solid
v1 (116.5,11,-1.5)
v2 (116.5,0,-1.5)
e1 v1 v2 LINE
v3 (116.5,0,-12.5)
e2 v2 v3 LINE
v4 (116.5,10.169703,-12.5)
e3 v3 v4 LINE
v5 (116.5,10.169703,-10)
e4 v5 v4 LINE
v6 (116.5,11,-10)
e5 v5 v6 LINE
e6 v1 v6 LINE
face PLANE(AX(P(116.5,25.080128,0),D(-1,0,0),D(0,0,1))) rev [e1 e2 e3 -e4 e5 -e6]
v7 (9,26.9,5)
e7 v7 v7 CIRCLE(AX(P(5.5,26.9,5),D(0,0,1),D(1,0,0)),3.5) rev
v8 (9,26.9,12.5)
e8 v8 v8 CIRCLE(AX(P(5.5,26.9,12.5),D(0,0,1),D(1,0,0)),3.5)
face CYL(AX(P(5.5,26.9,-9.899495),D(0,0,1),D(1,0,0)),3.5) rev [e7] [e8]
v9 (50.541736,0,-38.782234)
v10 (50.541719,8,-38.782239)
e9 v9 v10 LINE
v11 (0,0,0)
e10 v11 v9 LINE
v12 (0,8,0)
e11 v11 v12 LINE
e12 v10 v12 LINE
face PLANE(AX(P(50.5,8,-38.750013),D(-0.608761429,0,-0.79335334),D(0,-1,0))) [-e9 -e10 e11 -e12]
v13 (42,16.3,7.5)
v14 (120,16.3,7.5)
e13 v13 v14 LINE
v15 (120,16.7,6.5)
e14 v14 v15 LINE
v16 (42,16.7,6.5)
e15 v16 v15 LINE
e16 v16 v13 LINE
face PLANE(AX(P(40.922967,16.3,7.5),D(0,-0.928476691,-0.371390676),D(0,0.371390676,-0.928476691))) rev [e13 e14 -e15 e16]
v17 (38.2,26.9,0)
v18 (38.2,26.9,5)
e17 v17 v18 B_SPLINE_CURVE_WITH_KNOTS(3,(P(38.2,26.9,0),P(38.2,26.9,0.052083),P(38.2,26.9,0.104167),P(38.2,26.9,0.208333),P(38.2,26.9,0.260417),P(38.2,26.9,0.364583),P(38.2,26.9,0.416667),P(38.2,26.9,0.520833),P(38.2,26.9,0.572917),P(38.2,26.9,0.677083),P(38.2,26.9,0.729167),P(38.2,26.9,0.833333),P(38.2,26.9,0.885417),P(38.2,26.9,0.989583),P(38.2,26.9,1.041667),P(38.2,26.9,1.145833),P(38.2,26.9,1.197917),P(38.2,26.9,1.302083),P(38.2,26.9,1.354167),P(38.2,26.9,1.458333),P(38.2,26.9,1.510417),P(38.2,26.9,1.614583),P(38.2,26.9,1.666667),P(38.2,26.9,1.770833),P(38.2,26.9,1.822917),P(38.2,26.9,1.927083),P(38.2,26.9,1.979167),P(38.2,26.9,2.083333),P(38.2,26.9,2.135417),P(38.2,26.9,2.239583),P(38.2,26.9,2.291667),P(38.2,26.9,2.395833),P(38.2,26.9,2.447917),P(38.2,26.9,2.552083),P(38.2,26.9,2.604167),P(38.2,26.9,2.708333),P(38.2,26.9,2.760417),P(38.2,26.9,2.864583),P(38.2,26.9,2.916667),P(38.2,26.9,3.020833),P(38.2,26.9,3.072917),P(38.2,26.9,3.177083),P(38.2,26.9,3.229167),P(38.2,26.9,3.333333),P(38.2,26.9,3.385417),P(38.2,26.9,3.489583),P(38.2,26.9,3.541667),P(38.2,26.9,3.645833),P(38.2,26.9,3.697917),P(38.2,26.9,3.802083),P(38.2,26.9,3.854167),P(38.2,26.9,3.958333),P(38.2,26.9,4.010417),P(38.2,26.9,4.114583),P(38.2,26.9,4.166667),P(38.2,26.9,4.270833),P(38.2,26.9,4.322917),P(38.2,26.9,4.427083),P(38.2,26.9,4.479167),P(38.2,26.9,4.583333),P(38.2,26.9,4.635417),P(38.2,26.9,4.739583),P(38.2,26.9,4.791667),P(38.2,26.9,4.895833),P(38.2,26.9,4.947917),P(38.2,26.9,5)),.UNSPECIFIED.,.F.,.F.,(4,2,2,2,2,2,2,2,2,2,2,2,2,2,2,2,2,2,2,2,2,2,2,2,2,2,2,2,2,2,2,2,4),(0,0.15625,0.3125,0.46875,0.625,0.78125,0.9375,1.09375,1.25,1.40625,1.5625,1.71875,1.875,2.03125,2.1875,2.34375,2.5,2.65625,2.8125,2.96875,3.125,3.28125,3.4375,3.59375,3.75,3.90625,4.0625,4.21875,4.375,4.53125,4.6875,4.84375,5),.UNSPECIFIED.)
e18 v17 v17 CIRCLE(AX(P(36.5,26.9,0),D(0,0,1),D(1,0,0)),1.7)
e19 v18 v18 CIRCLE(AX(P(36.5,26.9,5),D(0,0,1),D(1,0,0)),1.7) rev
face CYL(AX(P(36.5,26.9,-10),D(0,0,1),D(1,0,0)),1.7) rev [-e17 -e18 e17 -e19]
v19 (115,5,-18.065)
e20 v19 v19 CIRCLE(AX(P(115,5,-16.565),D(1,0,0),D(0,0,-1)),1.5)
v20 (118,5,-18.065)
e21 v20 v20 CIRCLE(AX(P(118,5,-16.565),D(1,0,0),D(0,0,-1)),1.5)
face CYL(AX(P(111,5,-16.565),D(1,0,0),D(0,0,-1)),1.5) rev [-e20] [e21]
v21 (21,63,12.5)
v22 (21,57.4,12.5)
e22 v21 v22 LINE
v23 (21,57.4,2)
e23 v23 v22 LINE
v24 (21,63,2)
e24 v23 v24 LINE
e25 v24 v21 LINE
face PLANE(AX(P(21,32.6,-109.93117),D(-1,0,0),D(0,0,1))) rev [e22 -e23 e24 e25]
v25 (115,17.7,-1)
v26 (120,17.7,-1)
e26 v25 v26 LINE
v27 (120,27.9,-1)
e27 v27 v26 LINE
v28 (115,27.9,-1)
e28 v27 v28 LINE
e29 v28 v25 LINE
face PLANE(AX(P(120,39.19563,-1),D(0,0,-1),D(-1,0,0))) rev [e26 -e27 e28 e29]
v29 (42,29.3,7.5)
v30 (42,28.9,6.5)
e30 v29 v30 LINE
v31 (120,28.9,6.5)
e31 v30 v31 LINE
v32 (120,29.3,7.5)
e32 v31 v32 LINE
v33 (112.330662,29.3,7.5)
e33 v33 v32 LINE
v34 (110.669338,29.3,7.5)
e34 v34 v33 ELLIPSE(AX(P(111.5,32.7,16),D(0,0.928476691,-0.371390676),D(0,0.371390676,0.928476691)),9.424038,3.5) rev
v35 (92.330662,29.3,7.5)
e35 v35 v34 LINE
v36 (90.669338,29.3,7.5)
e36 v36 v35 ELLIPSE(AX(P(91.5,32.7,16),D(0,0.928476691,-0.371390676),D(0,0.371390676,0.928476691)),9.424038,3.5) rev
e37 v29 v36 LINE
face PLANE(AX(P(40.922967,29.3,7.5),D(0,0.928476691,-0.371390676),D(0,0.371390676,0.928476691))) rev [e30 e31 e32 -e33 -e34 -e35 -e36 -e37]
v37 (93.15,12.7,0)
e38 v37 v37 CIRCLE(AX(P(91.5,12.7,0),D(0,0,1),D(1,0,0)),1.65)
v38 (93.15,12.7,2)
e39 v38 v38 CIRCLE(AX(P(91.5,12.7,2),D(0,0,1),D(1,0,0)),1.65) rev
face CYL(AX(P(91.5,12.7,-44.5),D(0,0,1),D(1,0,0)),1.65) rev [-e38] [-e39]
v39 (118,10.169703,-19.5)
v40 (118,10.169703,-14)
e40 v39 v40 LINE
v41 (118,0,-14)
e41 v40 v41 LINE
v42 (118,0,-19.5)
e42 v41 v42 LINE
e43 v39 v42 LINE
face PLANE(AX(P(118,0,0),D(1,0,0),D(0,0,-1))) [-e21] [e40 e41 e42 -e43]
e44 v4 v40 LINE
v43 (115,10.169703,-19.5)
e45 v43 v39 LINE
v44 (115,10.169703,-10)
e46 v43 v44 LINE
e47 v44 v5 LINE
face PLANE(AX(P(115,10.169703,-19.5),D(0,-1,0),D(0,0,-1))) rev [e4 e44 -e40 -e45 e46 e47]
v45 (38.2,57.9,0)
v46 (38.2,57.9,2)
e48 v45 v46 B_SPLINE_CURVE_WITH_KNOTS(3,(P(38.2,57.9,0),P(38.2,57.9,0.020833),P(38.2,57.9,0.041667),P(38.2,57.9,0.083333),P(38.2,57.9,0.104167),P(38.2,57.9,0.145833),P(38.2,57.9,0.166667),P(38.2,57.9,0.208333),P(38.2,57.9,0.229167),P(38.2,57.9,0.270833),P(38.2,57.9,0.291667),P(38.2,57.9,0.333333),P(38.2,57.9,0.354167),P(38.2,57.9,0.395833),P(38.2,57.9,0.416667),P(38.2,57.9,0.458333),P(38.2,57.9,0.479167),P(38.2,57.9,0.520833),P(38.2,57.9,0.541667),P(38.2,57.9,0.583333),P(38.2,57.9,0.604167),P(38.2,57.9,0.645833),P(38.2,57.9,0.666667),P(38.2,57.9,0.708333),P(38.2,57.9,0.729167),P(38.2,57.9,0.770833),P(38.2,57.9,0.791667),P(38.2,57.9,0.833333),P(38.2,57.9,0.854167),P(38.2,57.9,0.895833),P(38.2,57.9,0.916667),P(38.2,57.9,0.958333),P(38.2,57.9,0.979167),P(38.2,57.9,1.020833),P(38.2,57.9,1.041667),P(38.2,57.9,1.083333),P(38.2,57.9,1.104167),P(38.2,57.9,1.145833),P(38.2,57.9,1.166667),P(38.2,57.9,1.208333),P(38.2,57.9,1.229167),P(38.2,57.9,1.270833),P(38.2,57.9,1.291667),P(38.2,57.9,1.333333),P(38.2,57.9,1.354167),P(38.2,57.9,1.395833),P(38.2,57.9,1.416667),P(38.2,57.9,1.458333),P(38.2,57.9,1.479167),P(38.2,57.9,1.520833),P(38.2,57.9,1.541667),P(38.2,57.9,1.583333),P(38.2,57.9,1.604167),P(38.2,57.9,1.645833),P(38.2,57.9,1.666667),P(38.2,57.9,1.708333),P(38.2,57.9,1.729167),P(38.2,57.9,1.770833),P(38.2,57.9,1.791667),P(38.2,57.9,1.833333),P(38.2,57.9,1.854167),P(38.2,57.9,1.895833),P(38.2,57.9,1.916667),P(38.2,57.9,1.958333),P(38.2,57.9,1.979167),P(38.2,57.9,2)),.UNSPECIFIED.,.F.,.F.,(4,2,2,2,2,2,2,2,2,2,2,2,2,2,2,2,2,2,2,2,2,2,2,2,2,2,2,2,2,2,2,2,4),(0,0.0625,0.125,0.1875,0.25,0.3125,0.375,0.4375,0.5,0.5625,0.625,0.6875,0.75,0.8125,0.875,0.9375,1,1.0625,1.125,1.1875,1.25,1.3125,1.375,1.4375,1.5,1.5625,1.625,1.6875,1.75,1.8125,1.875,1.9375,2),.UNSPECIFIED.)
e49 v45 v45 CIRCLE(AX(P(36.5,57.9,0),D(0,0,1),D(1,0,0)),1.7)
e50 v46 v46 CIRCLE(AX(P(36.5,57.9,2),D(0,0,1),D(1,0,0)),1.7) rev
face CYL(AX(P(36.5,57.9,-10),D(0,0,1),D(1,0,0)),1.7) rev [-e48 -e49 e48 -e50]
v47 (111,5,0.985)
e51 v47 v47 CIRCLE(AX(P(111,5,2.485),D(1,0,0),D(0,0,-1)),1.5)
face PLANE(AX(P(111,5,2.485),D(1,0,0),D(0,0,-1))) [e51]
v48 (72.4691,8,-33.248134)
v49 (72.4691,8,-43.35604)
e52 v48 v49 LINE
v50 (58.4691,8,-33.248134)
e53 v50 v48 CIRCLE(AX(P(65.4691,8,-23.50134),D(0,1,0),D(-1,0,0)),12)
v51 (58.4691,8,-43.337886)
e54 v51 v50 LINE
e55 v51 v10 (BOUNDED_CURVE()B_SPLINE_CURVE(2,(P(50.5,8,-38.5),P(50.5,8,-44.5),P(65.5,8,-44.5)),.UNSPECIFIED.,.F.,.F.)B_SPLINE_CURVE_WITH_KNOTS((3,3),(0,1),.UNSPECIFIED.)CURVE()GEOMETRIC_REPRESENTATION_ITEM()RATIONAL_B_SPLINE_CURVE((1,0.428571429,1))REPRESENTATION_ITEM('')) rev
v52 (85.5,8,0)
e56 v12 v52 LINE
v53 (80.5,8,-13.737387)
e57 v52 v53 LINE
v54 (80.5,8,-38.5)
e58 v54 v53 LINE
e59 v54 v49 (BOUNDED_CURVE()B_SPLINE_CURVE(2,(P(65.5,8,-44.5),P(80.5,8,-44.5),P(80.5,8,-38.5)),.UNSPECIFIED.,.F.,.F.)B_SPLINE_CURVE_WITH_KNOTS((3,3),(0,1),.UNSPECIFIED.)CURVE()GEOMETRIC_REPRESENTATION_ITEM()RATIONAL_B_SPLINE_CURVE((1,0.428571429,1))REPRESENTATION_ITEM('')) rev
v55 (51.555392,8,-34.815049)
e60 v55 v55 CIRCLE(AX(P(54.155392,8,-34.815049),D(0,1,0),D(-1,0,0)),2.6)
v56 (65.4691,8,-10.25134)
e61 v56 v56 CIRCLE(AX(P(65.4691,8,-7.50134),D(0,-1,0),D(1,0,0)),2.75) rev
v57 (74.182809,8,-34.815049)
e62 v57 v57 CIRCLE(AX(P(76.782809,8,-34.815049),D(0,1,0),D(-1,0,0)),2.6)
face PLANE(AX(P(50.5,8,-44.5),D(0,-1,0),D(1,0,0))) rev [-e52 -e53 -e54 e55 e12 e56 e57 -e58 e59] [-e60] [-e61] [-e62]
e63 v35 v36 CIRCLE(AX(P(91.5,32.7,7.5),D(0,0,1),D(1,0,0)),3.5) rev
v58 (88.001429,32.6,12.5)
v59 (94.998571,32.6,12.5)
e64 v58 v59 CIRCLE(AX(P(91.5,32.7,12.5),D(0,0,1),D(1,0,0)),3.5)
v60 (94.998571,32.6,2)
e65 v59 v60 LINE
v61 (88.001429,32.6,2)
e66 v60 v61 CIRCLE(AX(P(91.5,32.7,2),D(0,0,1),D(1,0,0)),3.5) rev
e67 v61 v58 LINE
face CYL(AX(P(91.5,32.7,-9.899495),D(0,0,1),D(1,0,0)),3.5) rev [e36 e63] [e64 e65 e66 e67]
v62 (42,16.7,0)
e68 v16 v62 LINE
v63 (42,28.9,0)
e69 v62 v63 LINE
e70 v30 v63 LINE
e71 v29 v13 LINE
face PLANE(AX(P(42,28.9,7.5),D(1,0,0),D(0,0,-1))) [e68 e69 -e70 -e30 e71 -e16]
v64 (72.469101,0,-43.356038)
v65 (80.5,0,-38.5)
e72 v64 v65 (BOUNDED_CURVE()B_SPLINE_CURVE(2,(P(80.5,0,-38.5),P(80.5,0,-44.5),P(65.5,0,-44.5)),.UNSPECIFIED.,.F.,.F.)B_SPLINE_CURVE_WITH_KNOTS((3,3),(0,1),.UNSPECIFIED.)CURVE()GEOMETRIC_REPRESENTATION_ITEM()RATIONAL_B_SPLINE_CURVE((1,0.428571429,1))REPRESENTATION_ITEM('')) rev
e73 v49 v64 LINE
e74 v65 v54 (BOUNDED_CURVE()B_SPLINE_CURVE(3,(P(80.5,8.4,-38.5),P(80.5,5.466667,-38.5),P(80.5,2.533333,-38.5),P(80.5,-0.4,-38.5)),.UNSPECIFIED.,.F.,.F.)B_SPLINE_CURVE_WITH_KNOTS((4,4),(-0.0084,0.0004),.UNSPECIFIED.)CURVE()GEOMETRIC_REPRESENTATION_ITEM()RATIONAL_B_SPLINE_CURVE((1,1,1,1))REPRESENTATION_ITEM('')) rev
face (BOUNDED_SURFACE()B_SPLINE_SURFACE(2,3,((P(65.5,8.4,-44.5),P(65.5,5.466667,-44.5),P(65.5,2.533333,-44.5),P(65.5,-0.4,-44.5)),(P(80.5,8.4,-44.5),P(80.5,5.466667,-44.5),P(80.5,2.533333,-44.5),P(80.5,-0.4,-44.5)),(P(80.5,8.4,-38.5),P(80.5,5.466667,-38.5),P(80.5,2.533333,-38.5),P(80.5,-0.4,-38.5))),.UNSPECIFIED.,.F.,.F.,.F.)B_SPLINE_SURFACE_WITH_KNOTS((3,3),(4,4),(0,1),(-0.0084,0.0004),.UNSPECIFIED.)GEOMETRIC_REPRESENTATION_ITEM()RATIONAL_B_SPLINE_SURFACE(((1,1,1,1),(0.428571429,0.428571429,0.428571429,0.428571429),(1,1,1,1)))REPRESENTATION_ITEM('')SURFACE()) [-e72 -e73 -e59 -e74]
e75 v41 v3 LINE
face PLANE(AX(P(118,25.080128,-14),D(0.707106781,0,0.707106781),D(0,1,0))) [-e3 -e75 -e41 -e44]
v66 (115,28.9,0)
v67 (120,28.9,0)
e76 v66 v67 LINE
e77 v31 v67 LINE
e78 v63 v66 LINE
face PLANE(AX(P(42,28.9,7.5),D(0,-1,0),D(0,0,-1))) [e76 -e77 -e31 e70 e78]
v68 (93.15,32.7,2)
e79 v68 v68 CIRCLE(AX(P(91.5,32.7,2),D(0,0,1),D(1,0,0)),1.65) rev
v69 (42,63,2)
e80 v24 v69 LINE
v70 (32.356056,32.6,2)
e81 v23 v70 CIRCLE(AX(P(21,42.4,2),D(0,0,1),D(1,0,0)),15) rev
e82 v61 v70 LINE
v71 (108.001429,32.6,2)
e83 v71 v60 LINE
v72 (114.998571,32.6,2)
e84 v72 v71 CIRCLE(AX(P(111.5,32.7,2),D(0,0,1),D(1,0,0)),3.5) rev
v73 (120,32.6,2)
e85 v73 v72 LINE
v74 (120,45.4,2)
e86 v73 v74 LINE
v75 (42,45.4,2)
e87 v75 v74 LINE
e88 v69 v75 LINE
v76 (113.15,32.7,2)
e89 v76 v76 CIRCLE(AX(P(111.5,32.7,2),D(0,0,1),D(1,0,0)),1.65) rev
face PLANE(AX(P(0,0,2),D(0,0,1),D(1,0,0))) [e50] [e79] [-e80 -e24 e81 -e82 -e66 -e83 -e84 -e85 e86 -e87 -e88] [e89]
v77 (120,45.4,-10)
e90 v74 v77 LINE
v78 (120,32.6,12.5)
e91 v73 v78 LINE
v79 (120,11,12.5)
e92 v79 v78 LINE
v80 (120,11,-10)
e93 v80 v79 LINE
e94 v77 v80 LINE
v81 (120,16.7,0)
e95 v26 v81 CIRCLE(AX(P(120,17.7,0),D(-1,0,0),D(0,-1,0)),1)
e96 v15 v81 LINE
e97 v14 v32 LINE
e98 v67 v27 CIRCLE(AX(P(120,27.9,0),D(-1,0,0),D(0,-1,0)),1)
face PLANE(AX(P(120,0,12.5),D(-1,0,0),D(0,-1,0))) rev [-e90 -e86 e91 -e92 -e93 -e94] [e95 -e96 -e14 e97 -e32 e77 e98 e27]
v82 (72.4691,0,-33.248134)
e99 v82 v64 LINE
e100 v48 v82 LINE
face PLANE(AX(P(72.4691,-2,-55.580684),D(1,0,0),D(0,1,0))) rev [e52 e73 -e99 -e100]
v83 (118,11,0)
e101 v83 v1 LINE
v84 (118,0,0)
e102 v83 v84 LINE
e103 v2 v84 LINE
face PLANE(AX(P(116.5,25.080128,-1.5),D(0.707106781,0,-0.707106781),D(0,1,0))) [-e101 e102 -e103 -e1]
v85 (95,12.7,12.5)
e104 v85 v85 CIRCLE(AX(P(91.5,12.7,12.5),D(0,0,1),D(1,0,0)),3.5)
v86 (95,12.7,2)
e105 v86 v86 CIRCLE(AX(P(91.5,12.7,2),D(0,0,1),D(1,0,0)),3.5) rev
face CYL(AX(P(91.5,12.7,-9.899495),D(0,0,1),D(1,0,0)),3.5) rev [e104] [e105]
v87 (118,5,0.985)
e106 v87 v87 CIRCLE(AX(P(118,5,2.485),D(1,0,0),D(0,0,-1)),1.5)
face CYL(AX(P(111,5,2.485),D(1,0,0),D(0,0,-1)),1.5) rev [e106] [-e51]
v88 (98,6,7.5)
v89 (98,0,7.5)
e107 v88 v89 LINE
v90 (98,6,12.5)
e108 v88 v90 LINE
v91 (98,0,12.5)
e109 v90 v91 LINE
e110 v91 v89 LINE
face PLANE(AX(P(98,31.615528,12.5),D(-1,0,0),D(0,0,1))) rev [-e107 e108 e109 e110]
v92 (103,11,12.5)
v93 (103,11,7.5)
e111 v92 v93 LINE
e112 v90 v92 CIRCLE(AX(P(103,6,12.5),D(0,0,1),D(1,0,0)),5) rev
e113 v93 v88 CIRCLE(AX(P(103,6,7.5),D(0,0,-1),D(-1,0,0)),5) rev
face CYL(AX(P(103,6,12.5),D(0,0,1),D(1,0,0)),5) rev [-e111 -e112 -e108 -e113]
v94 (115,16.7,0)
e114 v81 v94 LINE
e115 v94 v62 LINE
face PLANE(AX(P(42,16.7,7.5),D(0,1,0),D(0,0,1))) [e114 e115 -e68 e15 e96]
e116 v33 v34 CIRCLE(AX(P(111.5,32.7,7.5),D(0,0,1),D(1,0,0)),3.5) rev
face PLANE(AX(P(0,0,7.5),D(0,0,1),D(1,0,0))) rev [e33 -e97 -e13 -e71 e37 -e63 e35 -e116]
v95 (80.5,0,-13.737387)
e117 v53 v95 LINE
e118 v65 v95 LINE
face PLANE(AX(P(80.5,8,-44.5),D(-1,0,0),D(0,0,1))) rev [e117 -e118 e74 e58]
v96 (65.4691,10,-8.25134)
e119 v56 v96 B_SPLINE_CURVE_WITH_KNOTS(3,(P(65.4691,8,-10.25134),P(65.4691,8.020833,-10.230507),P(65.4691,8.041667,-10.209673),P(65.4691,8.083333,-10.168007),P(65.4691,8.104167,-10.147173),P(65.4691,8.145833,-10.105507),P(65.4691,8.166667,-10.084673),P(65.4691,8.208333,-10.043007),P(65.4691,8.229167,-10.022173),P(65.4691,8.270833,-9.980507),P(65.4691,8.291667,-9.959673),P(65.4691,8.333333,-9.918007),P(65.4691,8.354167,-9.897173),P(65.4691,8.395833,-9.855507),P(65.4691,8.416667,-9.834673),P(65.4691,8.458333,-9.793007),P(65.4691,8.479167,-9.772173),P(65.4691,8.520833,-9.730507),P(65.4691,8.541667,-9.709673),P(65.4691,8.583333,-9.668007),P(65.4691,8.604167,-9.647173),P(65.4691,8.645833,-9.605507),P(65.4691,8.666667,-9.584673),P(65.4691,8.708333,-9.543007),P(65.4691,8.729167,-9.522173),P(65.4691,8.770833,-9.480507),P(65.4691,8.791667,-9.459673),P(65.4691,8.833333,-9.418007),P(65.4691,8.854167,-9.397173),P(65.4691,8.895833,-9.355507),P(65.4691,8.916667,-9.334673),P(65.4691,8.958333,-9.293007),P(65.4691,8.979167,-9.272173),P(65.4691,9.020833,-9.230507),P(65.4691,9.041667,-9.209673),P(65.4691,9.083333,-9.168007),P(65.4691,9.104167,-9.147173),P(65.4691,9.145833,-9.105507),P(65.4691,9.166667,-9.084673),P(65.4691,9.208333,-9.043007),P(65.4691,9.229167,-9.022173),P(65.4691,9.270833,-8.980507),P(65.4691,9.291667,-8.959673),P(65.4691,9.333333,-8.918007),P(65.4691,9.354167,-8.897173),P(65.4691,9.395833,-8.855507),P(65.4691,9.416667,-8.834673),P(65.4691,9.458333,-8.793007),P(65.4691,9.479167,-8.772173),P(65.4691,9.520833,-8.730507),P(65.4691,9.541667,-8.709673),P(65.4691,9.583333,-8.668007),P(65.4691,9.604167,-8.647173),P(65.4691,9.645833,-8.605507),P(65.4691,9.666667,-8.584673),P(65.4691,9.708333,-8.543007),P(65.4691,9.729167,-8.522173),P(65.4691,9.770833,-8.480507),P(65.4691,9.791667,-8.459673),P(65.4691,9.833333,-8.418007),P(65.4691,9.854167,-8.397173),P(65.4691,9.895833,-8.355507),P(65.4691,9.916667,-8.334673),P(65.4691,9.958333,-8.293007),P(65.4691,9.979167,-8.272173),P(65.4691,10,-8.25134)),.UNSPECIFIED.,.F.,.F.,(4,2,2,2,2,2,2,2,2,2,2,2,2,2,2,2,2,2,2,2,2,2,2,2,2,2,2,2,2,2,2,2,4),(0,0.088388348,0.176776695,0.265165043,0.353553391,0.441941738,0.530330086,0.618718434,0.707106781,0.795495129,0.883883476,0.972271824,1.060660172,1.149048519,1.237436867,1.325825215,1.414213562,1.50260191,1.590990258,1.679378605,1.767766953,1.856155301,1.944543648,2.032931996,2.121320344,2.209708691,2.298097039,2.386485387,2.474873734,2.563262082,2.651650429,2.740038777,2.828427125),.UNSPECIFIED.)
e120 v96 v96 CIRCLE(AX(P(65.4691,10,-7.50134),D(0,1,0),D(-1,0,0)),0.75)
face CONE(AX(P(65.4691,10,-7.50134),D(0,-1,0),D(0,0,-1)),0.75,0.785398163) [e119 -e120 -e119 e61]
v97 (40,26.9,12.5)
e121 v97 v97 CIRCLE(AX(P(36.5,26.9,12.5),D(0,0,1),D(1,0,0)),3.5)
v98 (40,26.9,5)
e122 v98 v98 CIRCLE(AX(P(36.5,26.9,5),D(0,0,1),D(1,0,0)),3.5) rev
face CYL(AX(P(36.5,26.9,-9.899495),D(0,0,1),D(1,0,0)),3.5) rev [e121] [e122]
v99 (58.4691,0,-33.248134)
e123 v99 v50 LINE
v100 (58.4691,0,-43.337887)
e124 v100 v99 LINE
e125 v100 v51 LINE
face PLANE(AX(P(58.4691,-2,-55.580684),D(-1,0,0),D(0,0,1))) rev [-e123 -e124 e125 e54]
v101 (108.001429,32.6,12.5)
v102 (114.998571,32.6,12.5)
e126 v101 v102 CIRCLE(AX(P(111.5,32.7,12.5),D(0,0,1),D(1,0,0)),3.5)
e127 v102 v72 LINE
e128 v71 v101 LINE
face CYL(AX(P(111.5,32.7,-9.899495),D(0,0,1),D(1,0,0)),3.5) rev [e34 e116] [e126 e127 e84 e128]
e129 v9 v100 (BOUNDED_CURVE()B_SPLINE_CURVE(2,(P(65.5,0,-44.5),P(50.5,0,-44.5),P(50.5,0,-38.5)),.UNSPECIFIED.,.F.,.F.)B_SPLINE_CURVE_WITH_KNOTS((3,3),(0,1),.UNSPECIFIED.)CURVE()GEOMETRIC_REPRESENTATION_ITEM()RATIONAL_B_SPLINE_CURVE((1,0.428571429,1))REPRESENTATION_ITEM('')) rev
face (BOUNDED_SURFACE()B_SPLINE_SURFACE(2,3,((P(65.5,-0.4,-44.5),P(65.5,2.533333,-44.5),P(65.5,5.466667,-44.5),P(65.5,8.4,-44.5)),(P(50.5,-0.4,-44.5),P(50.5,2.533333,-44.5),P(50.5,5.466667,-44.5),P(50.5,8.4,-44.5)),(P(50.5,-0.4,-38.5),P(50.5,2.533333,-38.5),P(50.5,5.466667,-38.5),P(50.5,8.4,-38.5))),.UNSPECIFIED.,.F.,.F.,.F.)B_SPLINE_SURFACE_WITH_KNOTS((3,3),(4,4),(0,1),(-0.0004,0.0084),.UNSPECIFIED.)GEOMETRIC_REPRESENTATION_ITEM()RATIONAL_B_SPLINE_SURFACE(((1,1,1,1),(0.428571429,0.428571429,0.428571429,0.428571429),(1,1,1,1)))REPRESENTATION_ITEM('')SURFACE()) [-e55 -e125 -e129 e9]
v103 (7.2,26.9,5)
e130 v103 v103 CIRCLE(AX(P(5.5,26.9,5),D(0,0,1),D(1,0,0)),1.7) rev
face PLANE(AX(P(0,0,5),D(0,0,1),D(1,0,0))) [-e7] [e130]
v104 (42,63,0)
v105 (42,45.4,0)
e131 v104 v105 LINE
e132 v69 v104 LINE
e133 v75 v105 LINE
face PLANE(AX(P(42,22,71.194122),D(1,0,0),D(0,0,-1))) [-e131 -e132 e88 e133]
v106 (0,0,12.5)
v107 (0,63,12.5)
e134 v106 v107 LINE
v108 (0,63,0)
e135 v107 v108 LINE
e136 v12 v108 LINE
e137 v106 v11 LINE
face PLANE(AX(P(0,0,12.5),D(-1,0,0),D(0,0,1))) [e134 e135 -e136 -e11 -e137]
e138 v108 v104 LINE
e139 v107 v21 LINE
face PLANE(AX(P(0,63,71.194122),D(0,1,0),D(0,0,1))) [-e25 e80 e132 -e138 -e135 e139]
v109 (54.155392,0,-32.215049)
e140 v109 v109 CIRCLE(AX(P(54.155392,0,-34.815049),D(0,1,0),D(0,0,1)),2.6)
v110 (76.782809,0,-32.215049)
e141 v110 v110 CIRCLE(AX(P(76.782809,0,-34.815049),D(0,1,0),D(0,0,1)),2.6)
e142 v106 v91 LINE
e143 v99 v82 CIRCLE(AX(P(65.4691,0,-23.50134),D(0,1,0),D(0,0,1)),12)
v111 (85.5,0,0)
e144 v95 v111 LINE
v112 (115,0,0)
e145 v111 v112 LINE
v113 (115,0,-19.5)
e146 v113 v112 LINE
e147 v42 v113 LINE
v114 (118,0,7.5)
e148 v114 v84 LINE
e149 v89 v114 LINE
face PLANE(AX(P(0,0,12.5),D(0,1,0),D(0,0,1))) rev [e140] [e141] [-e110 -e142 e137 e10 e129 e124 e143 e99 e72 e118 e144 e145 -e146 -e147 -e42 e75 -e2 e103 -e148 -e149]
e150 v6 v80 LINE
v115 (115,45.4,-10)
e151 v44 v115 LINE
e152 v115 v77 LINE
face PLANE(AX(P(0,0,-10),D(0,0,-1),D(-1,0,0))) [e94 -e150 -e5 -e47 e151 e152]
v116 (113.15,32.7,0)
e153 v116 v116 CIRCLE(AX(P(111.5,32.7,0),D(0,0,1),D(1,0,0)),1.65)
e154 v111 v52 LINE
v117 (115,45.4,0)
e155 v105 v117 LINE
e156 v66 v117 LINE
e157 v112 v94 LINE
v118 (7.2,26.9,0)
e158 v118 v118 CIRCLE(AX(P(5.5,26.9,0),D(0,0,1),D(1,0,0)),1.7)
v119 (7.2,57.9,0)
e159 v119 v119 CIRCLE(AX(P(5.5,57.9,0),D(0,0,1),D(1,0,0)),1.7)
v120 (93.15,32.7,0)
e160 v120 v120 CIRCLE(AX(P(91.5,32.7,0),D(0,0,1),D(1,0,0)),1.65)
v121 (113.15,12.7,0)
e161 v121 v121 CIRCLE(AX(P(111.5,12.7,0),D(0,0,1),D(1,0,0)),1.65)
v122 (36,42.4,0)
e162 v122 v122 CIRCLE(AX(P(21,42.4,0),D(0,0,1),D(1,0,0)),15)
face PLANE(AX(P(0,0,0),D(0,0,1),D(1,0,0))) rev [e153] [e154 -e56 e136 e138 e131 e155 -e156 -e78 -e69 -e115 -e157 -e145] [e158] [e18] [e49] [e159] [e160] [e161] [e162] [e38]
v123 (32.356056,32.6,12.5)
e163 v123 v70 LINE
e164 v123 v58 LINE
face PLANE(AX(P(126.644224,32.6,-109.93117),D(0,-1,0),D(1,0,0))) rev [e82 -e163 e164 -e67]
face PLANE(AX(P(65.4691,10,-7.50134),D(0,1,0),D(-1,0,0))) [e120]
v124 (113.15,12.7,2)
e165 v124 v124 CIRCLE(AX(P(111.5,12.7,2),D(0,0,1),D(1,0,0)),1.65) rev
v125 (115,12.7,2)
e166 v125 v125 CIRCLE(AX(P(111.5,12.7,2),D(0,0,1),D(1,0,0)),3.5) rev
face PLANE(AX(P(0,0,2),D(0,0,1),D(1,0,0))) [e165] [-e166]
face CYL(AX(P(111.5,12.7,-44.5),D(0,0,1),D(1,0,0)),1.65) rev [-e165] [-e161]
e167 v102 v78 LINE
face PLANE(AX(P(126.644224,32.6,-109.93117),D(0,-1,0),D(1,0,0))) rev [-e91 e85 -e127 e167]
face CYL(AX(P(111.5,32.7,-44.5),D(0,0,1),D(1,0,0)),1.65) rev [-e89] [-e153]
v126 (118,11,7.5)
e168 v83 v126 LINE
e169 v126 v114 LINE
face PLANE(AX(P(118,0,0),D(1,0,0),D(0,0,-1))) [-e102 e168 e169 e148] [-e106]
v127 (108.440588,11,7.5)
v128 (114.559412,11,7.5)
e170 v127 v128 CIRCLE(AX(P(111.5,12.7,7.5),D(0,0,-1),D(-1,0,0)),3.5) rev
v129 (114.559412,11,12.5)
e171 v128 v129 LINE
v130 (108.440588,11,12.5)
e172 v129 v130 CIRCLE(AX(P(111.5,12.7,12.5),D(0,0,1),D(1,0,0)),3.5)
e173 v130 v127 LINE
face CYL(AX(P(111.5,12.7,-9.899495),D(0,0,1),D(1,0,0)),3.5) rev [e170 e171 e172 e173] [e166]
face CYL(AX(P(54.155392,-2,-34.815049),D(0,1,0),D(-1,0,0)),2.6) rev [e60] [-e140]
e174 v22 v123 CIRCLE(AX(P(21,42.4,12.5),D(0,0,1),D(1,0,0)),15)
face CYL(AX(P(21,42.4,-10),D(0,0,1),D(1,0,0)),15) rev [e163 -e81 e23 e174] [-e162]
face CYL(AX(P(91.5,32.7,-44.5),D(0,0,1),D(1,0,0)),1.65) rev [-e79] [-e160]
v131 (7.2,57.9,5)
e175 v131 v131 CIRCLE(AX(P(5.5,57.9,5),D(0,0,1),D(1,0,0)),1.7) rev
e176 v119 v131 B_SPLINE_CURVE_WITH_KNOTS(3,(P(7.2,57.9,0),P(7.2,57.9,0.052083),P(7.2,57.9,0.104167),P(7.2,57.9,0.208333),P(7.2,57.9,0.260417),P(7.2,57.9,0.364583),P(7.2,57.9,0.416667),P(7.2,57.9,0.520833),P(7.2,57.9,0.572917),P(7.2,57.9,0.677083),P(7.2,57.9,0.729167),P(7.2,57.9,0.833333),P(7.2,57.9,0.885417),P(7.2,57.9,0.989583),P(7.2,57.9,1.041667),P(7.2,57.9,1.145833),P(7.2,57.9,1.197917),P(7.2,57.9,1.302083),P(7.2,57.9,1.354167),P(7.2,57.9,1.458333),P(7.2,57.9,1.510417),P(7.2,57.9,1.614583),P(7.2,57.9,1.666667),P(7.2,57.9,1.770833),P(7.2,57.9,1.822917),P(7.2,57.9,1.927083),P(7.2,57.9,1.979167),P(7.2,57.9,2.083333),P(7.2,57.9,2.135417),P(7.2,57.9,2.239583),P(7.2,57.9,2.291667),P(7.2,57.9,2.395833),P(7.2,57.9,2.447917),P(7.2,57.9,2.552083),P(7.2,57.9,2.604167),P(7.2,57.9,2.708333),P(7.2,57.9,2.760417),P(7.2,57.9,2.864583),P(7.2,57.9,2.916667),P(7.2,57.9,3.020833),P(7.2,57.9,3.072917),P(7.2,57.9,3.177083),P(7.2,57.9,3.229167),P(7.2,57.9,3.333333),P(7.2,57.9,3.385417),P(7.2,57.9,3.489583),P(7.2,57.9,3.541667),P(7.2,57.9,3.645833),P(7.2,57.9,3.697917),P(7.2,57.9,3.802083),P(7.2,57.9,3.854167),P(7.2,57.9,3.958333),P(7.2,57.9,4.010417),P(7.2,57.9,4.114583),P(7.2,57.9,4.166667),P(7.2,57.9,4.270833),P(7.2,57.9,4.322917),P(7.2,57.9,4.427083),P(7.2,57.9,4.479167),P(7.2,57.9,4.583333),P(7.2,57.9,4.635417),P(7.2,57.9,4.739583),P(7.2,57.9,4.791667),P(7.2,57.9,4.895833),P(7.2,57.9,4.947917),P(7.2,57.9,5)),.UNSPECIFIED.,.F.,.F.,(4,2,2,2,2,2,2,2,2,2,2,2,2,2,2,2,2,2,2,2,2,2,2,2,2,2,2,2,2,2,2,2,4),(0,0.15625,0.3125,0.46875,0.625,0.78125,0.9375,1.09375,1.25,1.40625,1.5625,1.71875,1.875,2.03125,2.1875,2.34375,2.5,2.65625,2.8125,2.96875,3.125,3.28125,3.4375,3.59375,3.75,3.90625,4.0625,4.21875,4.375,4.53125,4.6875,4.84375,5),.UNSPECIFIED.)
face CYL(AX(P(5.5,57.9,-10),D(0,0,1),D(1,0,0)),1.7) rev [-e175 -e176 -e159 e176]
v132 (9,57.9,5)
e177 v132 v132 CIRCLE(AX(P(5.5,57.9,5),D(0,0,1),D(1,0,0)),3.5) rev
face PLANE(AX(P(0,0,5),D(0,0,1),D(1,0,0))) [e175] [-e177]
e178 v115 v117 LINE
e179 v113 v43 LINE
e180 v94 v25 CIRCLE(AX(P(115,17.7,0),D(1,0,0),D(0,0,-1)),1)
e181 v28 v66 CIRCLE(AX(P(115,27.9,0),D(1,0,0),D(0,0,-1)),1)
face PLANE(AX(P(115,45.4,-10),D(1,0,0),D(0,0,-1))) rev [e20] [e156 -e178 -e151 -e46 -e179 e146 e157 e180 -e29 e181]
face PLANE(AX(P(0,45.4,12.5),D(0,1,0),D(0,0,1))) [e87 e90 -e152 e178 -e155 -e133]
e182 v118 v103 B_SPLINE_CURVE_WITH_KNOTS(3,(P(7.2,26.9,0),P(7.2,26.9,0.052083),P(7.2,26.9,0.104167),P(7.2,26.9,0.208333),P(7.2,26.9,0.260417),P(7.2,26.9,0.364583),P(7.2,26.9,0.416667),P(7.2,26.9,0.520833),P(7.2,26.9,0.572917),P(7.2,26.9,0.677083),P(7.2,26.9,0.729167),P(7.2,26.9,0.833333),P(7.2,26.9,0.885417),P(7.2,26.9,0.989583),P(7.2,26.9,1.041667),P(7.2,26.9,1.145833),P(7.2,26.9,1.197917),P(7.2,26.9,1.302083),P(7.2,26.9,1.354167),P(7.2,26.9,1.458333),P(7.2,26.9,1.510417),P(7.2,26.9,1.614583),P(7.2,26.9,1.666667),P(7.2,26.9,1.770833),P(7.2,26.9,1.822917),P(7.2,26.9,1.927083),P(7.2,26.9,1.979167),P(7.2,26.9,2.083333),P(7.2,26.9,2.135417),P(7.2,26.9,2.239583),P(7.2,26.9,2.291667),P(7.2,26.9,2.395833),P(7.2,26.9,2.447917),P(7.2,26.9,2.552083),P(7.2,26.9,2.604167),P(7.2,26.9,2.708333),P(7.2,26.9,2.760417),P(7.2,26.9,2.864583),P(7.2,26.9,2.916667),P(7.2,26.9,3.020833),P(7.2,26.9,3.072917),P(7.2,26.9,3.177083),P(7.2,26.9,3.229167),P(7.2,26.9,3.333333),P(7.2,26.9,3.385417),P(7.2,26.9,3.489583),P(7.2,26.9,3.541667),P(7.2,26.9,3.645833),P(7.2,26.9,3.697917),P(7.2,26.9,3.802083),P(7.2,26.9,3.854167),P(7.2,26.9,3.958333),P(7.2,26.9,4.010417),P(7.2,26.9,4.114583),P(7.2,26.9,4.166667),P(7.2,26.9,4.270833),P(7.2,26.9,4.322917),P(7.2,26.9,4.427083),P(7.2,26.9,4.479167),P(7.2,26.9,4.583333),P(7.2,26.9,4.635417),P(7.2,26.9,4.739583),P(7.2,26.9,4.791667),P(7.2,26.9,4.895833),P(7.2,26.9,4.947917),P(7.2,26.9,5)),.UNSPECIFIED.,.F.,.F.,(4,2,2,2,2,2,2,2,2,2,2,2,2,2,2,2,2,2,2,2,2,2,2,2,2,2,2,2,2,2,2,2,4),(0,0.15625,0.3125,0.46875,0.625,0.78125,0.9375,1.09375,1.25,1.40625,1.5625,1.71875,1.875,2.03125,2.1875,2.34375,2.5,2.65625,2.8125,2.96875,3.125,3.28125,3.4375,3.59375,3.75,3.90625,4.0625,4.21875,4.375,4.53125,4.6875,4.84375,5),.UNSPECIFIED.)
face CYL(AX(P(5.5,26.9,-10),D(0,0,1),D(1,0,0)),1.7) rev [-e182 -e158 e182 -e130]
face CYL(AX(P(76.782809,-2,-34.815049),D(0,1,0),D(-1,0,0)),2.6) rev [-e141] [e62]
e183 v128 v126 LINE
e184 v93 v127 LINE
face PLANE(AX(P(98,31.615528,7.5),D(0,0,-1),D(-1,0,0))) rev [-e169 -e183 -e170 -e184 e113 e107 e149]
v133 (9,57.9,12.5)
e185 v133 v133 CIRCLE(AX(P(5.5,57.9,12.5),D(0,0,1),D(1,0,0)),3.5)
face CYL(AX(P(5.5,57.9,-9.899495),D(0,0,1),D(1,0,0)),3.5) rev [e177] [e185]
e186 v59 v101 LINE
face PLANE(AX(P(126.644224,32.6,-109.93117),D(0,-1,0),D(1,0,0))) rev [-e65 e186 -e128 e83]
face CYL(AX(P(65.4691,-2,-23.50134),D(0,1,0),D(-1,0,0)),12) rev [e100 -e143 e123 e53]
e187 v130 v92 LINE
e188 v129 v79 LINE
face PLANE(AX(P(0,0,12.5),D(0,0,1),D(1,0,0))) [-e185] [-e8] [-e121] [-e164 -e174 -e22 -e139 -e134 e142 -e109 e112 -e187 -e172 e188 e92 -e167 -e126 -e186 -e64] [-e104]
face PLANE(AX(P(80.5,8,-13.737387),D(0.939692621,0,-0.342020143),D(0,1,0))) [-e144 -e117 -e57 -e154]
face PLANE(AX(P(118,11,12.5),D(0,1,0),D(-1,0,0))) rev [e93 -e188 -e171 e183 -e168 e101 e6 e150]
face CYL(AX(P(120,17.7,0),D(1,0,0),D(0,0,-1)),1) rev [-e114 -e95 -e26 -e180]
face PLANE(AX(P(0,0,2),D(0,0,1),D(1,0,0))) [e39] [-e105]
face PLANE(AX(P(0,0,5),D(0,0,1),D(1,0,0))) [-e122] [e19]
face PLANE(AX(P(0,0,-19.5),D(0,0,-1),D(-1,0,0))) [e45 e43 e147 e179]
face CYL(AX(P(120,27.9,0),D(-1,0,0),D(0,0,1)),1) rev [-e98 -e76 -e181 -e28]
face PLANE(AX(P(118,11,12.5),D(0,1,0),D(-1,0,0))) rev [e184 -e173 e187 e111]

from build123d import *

# Parameters (mm, degrees)
SKETCH1_W               = 120
SKETCH1_H               = 45.4
BOSS_EXTRUDE1_DEPTH     = 12.5
SKETCH2_W               = 5
SKETCH2_H               = 45.4
BOSS_EXTRUDE2_DEPTH     = 10
CUT_EXTRUDE1_DEPTH      = 7.5
CUT_EXTRUDE1_DEPTH_BACK = 129.908533465
SKETCH3_W               = 78
SKETCH3_H               = 12.2
BOSS_EXTRUDE3_START     = -12.5
SKETCH4_W               = 42
SKETCH4_H               = 41
BOSS_EXTRUDE3_DEPTH     = 12.5
SKETCH5_R               = 15
SKETCH5_R_2             = 1.7
CUT_EXTRUDE2_DEPTH      = 138.38722648
SKETCH7_W               = 30
SKETCH7_H               = 8
BOSS_EXTRUDE4_DEPTH     = 44.5
SKETCH8_R               = 1.65
CUT_EXTRUDE4_DEPTH      = 148.030609058
FILLET1_SIZE            = 15
FILLET1_SIZE_2          = 6
SKETCH9_R               = 2.599999999
SKETCH9_R_2             = 12.000000007
CUT_EXTRUDE5_DEPTH      = 10
SKETCH10_R              = 3.5
CUT_EXTRUDE6_DEPTH      = 10.5
SKETCH12_R              = 3.5
CUT_EXTRUDE7_DEPTH      = 7.5
SKETCH6_W               = 105.644224039
SKETCH6_H               = 30.4
CUT_EXTRUDE3_DEPTH      = 10.5
CHAMFER1_SIZE           = 5
CHAMFER1_SIZE2          = 13.737387097
SKETCH13_W              = 14
SKETCH13_H              = 32.158687744
CUT_EXTRUDE8_DEPTH      = 10
SKETCH16_W              = 22.5
SKETCH16_H              = 11
CUT_EXTRUDE9_DEPTH      = 2
SKETCH18_W              = 3
SKETCH18_H              = 10.169703164
BOSS_EXTRUDE7_DEPTH     = 9.5
CUT_EXTRUDE10_REACH     = 144.298
SKETCH19_W              = 1.5
SKETCH19_H              = 14
SKETCH20_W              = 20
SKETCH20_H              = 5
CUT_EXTRUDE11_DEPTH     = 11
SKETCH21_R              = 1.5
CUT_EXTRUDE12_DEPTH     = 7
CHAMFER3_SIZE           = 1.5
FILLET3_R               = 5
CUT_EXTRUDE16_REACH     = 144.298
SKETCH24_W              = 5
SKETCH24_H              = 9
BOSS_EXTRUDE8_DEPTH     = 12.2
FILLET4_R               = 1
SKETCH15_R              = 2.75
BOSS_EXTRUDE9_DEPTH     = 2
CHAMFER4_SIZE           = 2
CHAMFER5_DEPTH          = 8


with BuildPart() as part:
    # Sketch1 → Boss-Extrude1 (new body)
    with BuildSketch(Plane.XY):
        with Locations((60, 22.7)):
            Rectangle(SKETCH1_W, SKETCH1_H)
    extrude(amount=BOSS_EXTRUDE1_DEPTH)

    # Sketch2 → Boss-Extrude2 (add)
    with BuildSketch(Plane(origin=(0, 0, 0), x_dir=(-1, 0, 0), z_dir=(0, 0, -1))):
        with Locations((-117.5, 22.7)):
            Rectangle(SKETCH2_W, SKETCH2_H)
    extrude(amount=BOSS_EXTRUDE2_DEPTH)

    # Sketch3 → Cut-Extrude1 (cut, two sides: drawn at the far end of the back side and taken through both)
    with BuildSketch(Plane.XY.offset(-CUT_EXTRUDE1_DEPTH_BACK)):
        with Locations((81, 22.8)):
            Rectangle(SKETCH3_W, SKETCH3_H)
    extrude(amount=CUT_EXTRUDE1_DEPTH + CUT_EXTRUDE1_DEPTH_BACK, mode=Mode.SUBTRACT)

    # Sketch4 → Boss-Extrude3 (add)
    with BuildSketch(Plane(origin=(0, 0, 0), x_dir=(-1, 0, 0), z_dir=(0, 0, -1)).offset(BOSS_EXTRUDE3_START)):
        with Locations((-21, 42.5)):
            Rectangle(SKETCH4_W, SKETCH4_H)
    extrude(amount=BOSS_EXTRUDE3_DEPTH)

    # Sketch5 → Cut-Extrude2 (cut, through all)
    with BuildSketch(Plane.XY.offset(12.5)):
        with Locations((21, 42.4)):
            Circle(SKETCH5_R)
        with Locations((5.5, 57.9)):
            Circle(SKETCH5_R_2)
        with Locations((36.5, 57.9)):
            Circle(SKETCH5_R_2)
        with Locations((36.5, 26.9)):
            Circle(SKETCH5_R_2)
        with Locations((5.5, 26.9)):
            Circle(SKETCH5_R_2)
    extrude(amount=-CUT_EXTRUDE2_DEPTH, mode=Mode.SUBTRACT)

    # Sketch7 → Boss-Extrude4 (add)
    with BuildSketch(Plane(origin=(0, 0, 0), x_dir=(-1, 0, 0), z_dir=(0, 0, -1))):
        with Locations((-65.5, 4)):
            Rectangle(SKETCH7_W, SKETCH7_H)
    extrude(amount=BOSS_EXTRUDE4_DEPTH)

    # Sketch8 → Cut-Extrude4 (cut, through all)
    with BuildSketch(Plane.XY.offset(12.5)):
        with Locations((91.5, 32.7)):
            Circle(SKETCH8_R)
        with Locations((111.5, 32.7)):
            Circle(SKETCH8_R)
        with Locations((111.5, 12.7)):
            Circle(SKETCH8_R)
        with Locations((91.5, 12.7)):
            Circle(SKETCH8_R)
    extrude(amount=-CUT_EXTRUDE4_DEPTH, mode=Mode.SUBTRACT)

    # Fillet1
    # a fillet whose section is not a circle: 15, 6 mm, written as the material it takes off along each edge
    with BuildSketch(Plane(origin=(50.5, -37.5, -44.5), x_dir=(1, 0, 0), z_dir=(0, 1, 0))) as fillet1_piece_1:
        with BuildLine():
            Bezier((FILLET1_SIZE, 0), (0, 0), (0, -FILLET1_SIZE_2), weights=[1, 0.428571429, 1])
            Line((0, -FILLET1_SIZE_2), (0, 0))
            Line((0, 0), (FILLET1_SIZE, 0))
        make_face()
    extrude(amount=83, mode=Mode.SUBTRACT)
    with BuildSketch(Plane(origin=(80.5, 45.5, -44.5), x_dir=(0, 0, 1), z_dir=(0, -1, 0))) as fillet1_piece_2:
        with BuildLine():
            Bezier((FILLET1_SIZE_2, 0), (0, 0), (0, FILLET1_SIZE), weights=[1, 0.428571429, 1])
            Line((0, FILLET1_SIZE), (0, 0))
            Line((0, 0), (FILLET1_SIZE_2, 0))
        make_face()
    extrude(amount=83, mode=Mode.SUBTRACT)

    # Sketch9 → Cut-Extrude5 (cut)
    with BuildSketch(Plane(origin=(0, 8, 0), x_dir=(1, 0, 0), z_dir=(0, 1, 0))):
        with Locations(Location((54.15539193, 34.815048574, 0), (0, 0, 180))):
            Circle(SKETCH9_R)
        with Locations(Location((65.469100429, 39.501340075, 0), (0, 0, 180))):
            Circle(SKETCH9_R)
        with Locations(Location((76.782808928, 34.815048574, 0), (0, 0, 180))):
            Circle(SKETCH9_R)
        with Locations(Location((65.469100429, 23.501340075, 0), (0, 0, 180))):
            Circle(SKETCH9_R_2)
    extrude(amount=-CUT_EXTRUDE5_DEPTH, mode=Mode.SUBTRACT)

    # Sketch10 → Cut-Extrude6 (cut)
    with BuildSketch(Plane.XY.offset(12.5)):
        with Locations((91.5, 32.7)):
            Circle(SKETCH10_R)
        with Locations((111.5, 32.7)):
            Circle(SKETCH10_R)
        with Locations((111.5, 12.7)):
            Circle(SKETCH10_R)
        with Locations((91.5, 12.7)):
            Circle(SKETCH10_R)
    extrude(amount=-CUT_EXTRUDE6_DEPTH, mode=Mode.SUBTRACT)

    # Sketch12 → Cut-Extrude7 (cut)
    with BuildSketch(Plane.XY.offset(12.5)):
        with Locations((36.5, 57.9)):
            Circle(SKETCH12_R)
        with Locations((5.5, 57.9)):
            Circle(SKETCH12_R)
        with Locations((5.5, 26.9)):
            Circle(SKETCH12_R)
        with Locations((36.5, 26.9)):
            Circle(SKETCH12_R)
    extrude(amount=-CUT_EXTRUDE7_DEPTH, mode=Mode.SUBTRACT)

    # Sketch6 → Cut-Extrude3 (cut)
    with BuildSketch(Plane.XY.offset(12.5)):
        with Locations((73.822112019, 47.8)):
            Rectangle(SKETCH6_W, SKETCH6_H)
    extrude(amount=-CUT_EXTRUDE3_DEPTH, mode=Mode.SUBTRACT)

    # Chamfer1
    chamfer1_edges = [part.edges().sort_by_distance(p)[0] for p in [
        (80.5, 4, 0),
    ]]
    chamfer1_side = [part.faces().sort_by_distance(p)[0] for p in [
        (40.688741063, 22.8, 0),
    ]]
    chamfer(chamfer1_edges, length=CHAMFER1_SIZE, length2=CHAMFER1_SIZE2, reference=chamfer1_side[0])

    # Sketch13 → Cut-Extrude8 (cut)
    with BuildSketch(Plane(origin=(0, 8, 0), x_dir=(1, 0, 0), z_dir=(0, 1, 0))):
        with Locations((65.469100429, 39.501340075)):
            Rectangle(SKETCH13_W, SKETCH13_H)
    extrude(amount=-CUT_EXTRUDE8_DEPTH, mode=Mode.SUBTRACT)

    # Sketch16 → Cut-Extrude9 (cut)
    with BuildSketch(Plane(origin=(120, 0, 0), x_dir=(0, 0, -1), z_dir=(1, 0, 0))):
        with Locations((-1.25, 5.5)):
            Rectangle(SKETCH16_W, SKETCH16_H)
    extrude(amount=-CUT_EXTRUDE9_DEPTH, mode=Mode.SUBTRACT)

    # Sketch18 → Boss-Extrude7 (add)
    with BuildSketch(Plane(origin=(0, 0, -10), x_dir=(-1, 0, 0), z_dir=(0, 0, -1))):
        with Locations((-116.5, 5.084851582)):
            Rectangle(SKETCH18_W, SKETCH18_H)
    extrude(amount=BOSS_EXTRUDE7_DEPTH)

    # Cut-Extrude10: up to this face of the body (flat: up to its plane)
    cut_extrude10_end = Plane(part.part.faces().sort_by_distance((119, 11, 1.25))[0])
    # Sketch19 → Cut-Extrude10 (cut, up to the picked face)
    with BuildSketch(Plane.XZ, mode=Mode.PRIVATE) as cut_extrude10_sk1:
        with Locations((117.25, -7)):
            Rectangle(SKETCH19_W, SKETCH19_H)
    cut_extrude10_tool1 = split(extrude(cut_extrude10_sk1.sketch, amount=-CUT_EXTRUDE10_REACH, mode=Mode.PRIVATE), bisect_by=cut_extrude10_end, keep=Keep.BOTH, mode=Mode.PRIVATE)
    add(cut_extrude10_tool1.solids().sort_by(Axis((117.25, 0, -7), (0, 1, 0)))[0], mode=Mode.SUBTRACT)

    # Sketch20 → Cut-Extrude11 (cut)
    with BuildSketch(Plane.XZ):
        with Locations((108, 10)):
            Rectangle(SKETCH20_W, SKETCH20_H)
    extrude(amount=-CUT_EXTRUDE11_DEPTH, mode=Mode.SUBTRACT)

    # Sketch21 → Cut-Extrude12 (cut)
    with BuildSketch(Plane(origin=(118, 0, 0), x_dir=(0, 0, -1), z_dir=(1, 0, 0))):
        with Locations((-2.485, 5)):
            Circle(SKETCH21_R)
        with Locations((16.565, 5)):
            Circle(SKETCH21_R)
    extrude(amount=-CUT_EXTRUDE12_DEPTH, mode=Mode.SUBTRACT)

    # Chamfer3
    chamfer3_edges = [part.edges().sort_by_distance(p)[0] for p in [
        (116.5, 5.084851582, -14),
        (116.5, 5.5, 0),
    ]]
    chamfer(chamfer3_edges, length=CHAMFER3_SIZE - 0.0001)  # a hair under: the kernel refuses the full size

    # Fillet3
    fillet3_edges = [part.edges().sort_by_distance(p)[0] for p in [
        (98, 11, 10),
    ]]
    fillet(fillet3_edges, radius=FILLET3_R)

    # Cut-Extrude16: up to this face of the body (flat: up to its plane)
    cut_extrude16_end = Plane(part.part.faces().sort_by_distance((42, 22.8, 3.75))[0])
    # Sketch23 → Cut-Extrude16 (cut, up to the picked face)
    with BuildSketch(Plane(origin=(120, 0, 0), x_dir=(0, 0, -1), z_dir=(1, 0, 0)), mode=Mode.PRIVATE) as cut_extrude16_sk1:
        Polygon((-6.5, 28.9), (-7.5, 28.9), (-7.5, 29.3), align=None)
    cut_extrude16_tool1 = split(extrude(cut_extrude16_sk1.sketch, amount=-CUT_EXTRUDE16_REACH, mode=Mode.PRIVATE), bisect_by=cut_extrude16_end, keep=Keep.BOTH, mode=Mode.PRIVATE)
    # Sketch23 → Cut-Extrude16 (cut, up to the picked face)
    with BuildSketch(Plane(origin=(120, 0, 0), x_dir=(0, 0, -1), z_dir=(1, 0, 0)), mode=Mode.PRIVATE) as cut_extrude16_sk2:
        Polygon((-7.5, 16.7), (-7.5, 16.3), (-6.5, 16.7), align=None)
    cut_extrude16_tool2 = split(extrude(cut_extrude16_sk2.sketch, amount=-CUT_EXTRUDE16_REACH, mode=Mode.PRIVATE), bisect_by=cut_extrude16_end, keep=Keep.BOTH, mode=Mode.PRIVATE)
    add(cut_extrude16_tool1.solids().sort_by(Axis((120, 29.033333, 7.166667), (-1, 0, 0)))[0], mode=Mode.SUBTRACT)
    add(cut_extrude16_tool2.solids().sort_by(Axis((120, 16.566667, 7.166667), (-1, 0, 0)))[0], mode=Mode.SUBTRACT)

    # Sketch24 → Boss-Extrude8 (add)
    with BuildSketch(Plane(origin=(0, 16.7, 0), x_dir=(1, 0, 0), z_dir=(0, 1, 0))):
        with Locations((117.5, 5.5)):
            Rectangle(SKETCH24_W, SKETCH24_H)
    extrude(amount=BOSS_EXTRUDE8_DEPTH)

    # Fillet4
    fillet4_edges = [part.edges().sort_by_distance(p)[0] for p in [
        (117.5, 28.9, -1),
        (117.5, 16.7, -1),
    ]]
    fillet(fillet4_edges, radius=FILLET4_R)

    # Sketch15 → Boss-Extrude9 (add)
    with BuildSketch(Plane(origin=(0, 8, 0), x_dir=(1, 0, 0), z_dir=(0, 1, 0))):
        with Locations((65.469100428, 7.501340074)):
            Circle(SKETCH15_R)
    extrude(amount=BOSS_EXTRUDE9_DEPTH)

    # Chamfer4
    chamfer4_edges = [part.edges().sort_by_distance(p)[0] for p in [
        (62.719100428, 10, -7.501340074),
    ]]
    chamfer(chamfer4_edges, length=CHAMFER4_SIZE - 0.0001)  # a hair under: the kernel refuses the full size

    # Chamfer5: read off the stored shape, not the designer's step
    # Chamfer5 outline → Chamfer5 (add)
    with BuildSketch(Plane(origin=(0, 0, 0), x_dir=(1, 0, 0), z_dir=(0, 1, 0))):
        with BuildLine():
            add(Edge.make_bspline(
                [(50.541922163, 38.782180687), (50.5, 38.636096407), (50.5, 38.5)],
                knots=[0.948627317, 0.948627317, 0.948627317, 1, 1, 1], degree=2, weights=[0.944304536, 0.970644181, 1]))
            Line((50.541922163, 38.782180687), (0, 0))
            Line((0, 0), (50.5, 0))
            Line((50.5, 0), (50.5, 38.5))
        make_face()
    extrude(amount=CHAMFER5_DEPTH)


solid = part.part
